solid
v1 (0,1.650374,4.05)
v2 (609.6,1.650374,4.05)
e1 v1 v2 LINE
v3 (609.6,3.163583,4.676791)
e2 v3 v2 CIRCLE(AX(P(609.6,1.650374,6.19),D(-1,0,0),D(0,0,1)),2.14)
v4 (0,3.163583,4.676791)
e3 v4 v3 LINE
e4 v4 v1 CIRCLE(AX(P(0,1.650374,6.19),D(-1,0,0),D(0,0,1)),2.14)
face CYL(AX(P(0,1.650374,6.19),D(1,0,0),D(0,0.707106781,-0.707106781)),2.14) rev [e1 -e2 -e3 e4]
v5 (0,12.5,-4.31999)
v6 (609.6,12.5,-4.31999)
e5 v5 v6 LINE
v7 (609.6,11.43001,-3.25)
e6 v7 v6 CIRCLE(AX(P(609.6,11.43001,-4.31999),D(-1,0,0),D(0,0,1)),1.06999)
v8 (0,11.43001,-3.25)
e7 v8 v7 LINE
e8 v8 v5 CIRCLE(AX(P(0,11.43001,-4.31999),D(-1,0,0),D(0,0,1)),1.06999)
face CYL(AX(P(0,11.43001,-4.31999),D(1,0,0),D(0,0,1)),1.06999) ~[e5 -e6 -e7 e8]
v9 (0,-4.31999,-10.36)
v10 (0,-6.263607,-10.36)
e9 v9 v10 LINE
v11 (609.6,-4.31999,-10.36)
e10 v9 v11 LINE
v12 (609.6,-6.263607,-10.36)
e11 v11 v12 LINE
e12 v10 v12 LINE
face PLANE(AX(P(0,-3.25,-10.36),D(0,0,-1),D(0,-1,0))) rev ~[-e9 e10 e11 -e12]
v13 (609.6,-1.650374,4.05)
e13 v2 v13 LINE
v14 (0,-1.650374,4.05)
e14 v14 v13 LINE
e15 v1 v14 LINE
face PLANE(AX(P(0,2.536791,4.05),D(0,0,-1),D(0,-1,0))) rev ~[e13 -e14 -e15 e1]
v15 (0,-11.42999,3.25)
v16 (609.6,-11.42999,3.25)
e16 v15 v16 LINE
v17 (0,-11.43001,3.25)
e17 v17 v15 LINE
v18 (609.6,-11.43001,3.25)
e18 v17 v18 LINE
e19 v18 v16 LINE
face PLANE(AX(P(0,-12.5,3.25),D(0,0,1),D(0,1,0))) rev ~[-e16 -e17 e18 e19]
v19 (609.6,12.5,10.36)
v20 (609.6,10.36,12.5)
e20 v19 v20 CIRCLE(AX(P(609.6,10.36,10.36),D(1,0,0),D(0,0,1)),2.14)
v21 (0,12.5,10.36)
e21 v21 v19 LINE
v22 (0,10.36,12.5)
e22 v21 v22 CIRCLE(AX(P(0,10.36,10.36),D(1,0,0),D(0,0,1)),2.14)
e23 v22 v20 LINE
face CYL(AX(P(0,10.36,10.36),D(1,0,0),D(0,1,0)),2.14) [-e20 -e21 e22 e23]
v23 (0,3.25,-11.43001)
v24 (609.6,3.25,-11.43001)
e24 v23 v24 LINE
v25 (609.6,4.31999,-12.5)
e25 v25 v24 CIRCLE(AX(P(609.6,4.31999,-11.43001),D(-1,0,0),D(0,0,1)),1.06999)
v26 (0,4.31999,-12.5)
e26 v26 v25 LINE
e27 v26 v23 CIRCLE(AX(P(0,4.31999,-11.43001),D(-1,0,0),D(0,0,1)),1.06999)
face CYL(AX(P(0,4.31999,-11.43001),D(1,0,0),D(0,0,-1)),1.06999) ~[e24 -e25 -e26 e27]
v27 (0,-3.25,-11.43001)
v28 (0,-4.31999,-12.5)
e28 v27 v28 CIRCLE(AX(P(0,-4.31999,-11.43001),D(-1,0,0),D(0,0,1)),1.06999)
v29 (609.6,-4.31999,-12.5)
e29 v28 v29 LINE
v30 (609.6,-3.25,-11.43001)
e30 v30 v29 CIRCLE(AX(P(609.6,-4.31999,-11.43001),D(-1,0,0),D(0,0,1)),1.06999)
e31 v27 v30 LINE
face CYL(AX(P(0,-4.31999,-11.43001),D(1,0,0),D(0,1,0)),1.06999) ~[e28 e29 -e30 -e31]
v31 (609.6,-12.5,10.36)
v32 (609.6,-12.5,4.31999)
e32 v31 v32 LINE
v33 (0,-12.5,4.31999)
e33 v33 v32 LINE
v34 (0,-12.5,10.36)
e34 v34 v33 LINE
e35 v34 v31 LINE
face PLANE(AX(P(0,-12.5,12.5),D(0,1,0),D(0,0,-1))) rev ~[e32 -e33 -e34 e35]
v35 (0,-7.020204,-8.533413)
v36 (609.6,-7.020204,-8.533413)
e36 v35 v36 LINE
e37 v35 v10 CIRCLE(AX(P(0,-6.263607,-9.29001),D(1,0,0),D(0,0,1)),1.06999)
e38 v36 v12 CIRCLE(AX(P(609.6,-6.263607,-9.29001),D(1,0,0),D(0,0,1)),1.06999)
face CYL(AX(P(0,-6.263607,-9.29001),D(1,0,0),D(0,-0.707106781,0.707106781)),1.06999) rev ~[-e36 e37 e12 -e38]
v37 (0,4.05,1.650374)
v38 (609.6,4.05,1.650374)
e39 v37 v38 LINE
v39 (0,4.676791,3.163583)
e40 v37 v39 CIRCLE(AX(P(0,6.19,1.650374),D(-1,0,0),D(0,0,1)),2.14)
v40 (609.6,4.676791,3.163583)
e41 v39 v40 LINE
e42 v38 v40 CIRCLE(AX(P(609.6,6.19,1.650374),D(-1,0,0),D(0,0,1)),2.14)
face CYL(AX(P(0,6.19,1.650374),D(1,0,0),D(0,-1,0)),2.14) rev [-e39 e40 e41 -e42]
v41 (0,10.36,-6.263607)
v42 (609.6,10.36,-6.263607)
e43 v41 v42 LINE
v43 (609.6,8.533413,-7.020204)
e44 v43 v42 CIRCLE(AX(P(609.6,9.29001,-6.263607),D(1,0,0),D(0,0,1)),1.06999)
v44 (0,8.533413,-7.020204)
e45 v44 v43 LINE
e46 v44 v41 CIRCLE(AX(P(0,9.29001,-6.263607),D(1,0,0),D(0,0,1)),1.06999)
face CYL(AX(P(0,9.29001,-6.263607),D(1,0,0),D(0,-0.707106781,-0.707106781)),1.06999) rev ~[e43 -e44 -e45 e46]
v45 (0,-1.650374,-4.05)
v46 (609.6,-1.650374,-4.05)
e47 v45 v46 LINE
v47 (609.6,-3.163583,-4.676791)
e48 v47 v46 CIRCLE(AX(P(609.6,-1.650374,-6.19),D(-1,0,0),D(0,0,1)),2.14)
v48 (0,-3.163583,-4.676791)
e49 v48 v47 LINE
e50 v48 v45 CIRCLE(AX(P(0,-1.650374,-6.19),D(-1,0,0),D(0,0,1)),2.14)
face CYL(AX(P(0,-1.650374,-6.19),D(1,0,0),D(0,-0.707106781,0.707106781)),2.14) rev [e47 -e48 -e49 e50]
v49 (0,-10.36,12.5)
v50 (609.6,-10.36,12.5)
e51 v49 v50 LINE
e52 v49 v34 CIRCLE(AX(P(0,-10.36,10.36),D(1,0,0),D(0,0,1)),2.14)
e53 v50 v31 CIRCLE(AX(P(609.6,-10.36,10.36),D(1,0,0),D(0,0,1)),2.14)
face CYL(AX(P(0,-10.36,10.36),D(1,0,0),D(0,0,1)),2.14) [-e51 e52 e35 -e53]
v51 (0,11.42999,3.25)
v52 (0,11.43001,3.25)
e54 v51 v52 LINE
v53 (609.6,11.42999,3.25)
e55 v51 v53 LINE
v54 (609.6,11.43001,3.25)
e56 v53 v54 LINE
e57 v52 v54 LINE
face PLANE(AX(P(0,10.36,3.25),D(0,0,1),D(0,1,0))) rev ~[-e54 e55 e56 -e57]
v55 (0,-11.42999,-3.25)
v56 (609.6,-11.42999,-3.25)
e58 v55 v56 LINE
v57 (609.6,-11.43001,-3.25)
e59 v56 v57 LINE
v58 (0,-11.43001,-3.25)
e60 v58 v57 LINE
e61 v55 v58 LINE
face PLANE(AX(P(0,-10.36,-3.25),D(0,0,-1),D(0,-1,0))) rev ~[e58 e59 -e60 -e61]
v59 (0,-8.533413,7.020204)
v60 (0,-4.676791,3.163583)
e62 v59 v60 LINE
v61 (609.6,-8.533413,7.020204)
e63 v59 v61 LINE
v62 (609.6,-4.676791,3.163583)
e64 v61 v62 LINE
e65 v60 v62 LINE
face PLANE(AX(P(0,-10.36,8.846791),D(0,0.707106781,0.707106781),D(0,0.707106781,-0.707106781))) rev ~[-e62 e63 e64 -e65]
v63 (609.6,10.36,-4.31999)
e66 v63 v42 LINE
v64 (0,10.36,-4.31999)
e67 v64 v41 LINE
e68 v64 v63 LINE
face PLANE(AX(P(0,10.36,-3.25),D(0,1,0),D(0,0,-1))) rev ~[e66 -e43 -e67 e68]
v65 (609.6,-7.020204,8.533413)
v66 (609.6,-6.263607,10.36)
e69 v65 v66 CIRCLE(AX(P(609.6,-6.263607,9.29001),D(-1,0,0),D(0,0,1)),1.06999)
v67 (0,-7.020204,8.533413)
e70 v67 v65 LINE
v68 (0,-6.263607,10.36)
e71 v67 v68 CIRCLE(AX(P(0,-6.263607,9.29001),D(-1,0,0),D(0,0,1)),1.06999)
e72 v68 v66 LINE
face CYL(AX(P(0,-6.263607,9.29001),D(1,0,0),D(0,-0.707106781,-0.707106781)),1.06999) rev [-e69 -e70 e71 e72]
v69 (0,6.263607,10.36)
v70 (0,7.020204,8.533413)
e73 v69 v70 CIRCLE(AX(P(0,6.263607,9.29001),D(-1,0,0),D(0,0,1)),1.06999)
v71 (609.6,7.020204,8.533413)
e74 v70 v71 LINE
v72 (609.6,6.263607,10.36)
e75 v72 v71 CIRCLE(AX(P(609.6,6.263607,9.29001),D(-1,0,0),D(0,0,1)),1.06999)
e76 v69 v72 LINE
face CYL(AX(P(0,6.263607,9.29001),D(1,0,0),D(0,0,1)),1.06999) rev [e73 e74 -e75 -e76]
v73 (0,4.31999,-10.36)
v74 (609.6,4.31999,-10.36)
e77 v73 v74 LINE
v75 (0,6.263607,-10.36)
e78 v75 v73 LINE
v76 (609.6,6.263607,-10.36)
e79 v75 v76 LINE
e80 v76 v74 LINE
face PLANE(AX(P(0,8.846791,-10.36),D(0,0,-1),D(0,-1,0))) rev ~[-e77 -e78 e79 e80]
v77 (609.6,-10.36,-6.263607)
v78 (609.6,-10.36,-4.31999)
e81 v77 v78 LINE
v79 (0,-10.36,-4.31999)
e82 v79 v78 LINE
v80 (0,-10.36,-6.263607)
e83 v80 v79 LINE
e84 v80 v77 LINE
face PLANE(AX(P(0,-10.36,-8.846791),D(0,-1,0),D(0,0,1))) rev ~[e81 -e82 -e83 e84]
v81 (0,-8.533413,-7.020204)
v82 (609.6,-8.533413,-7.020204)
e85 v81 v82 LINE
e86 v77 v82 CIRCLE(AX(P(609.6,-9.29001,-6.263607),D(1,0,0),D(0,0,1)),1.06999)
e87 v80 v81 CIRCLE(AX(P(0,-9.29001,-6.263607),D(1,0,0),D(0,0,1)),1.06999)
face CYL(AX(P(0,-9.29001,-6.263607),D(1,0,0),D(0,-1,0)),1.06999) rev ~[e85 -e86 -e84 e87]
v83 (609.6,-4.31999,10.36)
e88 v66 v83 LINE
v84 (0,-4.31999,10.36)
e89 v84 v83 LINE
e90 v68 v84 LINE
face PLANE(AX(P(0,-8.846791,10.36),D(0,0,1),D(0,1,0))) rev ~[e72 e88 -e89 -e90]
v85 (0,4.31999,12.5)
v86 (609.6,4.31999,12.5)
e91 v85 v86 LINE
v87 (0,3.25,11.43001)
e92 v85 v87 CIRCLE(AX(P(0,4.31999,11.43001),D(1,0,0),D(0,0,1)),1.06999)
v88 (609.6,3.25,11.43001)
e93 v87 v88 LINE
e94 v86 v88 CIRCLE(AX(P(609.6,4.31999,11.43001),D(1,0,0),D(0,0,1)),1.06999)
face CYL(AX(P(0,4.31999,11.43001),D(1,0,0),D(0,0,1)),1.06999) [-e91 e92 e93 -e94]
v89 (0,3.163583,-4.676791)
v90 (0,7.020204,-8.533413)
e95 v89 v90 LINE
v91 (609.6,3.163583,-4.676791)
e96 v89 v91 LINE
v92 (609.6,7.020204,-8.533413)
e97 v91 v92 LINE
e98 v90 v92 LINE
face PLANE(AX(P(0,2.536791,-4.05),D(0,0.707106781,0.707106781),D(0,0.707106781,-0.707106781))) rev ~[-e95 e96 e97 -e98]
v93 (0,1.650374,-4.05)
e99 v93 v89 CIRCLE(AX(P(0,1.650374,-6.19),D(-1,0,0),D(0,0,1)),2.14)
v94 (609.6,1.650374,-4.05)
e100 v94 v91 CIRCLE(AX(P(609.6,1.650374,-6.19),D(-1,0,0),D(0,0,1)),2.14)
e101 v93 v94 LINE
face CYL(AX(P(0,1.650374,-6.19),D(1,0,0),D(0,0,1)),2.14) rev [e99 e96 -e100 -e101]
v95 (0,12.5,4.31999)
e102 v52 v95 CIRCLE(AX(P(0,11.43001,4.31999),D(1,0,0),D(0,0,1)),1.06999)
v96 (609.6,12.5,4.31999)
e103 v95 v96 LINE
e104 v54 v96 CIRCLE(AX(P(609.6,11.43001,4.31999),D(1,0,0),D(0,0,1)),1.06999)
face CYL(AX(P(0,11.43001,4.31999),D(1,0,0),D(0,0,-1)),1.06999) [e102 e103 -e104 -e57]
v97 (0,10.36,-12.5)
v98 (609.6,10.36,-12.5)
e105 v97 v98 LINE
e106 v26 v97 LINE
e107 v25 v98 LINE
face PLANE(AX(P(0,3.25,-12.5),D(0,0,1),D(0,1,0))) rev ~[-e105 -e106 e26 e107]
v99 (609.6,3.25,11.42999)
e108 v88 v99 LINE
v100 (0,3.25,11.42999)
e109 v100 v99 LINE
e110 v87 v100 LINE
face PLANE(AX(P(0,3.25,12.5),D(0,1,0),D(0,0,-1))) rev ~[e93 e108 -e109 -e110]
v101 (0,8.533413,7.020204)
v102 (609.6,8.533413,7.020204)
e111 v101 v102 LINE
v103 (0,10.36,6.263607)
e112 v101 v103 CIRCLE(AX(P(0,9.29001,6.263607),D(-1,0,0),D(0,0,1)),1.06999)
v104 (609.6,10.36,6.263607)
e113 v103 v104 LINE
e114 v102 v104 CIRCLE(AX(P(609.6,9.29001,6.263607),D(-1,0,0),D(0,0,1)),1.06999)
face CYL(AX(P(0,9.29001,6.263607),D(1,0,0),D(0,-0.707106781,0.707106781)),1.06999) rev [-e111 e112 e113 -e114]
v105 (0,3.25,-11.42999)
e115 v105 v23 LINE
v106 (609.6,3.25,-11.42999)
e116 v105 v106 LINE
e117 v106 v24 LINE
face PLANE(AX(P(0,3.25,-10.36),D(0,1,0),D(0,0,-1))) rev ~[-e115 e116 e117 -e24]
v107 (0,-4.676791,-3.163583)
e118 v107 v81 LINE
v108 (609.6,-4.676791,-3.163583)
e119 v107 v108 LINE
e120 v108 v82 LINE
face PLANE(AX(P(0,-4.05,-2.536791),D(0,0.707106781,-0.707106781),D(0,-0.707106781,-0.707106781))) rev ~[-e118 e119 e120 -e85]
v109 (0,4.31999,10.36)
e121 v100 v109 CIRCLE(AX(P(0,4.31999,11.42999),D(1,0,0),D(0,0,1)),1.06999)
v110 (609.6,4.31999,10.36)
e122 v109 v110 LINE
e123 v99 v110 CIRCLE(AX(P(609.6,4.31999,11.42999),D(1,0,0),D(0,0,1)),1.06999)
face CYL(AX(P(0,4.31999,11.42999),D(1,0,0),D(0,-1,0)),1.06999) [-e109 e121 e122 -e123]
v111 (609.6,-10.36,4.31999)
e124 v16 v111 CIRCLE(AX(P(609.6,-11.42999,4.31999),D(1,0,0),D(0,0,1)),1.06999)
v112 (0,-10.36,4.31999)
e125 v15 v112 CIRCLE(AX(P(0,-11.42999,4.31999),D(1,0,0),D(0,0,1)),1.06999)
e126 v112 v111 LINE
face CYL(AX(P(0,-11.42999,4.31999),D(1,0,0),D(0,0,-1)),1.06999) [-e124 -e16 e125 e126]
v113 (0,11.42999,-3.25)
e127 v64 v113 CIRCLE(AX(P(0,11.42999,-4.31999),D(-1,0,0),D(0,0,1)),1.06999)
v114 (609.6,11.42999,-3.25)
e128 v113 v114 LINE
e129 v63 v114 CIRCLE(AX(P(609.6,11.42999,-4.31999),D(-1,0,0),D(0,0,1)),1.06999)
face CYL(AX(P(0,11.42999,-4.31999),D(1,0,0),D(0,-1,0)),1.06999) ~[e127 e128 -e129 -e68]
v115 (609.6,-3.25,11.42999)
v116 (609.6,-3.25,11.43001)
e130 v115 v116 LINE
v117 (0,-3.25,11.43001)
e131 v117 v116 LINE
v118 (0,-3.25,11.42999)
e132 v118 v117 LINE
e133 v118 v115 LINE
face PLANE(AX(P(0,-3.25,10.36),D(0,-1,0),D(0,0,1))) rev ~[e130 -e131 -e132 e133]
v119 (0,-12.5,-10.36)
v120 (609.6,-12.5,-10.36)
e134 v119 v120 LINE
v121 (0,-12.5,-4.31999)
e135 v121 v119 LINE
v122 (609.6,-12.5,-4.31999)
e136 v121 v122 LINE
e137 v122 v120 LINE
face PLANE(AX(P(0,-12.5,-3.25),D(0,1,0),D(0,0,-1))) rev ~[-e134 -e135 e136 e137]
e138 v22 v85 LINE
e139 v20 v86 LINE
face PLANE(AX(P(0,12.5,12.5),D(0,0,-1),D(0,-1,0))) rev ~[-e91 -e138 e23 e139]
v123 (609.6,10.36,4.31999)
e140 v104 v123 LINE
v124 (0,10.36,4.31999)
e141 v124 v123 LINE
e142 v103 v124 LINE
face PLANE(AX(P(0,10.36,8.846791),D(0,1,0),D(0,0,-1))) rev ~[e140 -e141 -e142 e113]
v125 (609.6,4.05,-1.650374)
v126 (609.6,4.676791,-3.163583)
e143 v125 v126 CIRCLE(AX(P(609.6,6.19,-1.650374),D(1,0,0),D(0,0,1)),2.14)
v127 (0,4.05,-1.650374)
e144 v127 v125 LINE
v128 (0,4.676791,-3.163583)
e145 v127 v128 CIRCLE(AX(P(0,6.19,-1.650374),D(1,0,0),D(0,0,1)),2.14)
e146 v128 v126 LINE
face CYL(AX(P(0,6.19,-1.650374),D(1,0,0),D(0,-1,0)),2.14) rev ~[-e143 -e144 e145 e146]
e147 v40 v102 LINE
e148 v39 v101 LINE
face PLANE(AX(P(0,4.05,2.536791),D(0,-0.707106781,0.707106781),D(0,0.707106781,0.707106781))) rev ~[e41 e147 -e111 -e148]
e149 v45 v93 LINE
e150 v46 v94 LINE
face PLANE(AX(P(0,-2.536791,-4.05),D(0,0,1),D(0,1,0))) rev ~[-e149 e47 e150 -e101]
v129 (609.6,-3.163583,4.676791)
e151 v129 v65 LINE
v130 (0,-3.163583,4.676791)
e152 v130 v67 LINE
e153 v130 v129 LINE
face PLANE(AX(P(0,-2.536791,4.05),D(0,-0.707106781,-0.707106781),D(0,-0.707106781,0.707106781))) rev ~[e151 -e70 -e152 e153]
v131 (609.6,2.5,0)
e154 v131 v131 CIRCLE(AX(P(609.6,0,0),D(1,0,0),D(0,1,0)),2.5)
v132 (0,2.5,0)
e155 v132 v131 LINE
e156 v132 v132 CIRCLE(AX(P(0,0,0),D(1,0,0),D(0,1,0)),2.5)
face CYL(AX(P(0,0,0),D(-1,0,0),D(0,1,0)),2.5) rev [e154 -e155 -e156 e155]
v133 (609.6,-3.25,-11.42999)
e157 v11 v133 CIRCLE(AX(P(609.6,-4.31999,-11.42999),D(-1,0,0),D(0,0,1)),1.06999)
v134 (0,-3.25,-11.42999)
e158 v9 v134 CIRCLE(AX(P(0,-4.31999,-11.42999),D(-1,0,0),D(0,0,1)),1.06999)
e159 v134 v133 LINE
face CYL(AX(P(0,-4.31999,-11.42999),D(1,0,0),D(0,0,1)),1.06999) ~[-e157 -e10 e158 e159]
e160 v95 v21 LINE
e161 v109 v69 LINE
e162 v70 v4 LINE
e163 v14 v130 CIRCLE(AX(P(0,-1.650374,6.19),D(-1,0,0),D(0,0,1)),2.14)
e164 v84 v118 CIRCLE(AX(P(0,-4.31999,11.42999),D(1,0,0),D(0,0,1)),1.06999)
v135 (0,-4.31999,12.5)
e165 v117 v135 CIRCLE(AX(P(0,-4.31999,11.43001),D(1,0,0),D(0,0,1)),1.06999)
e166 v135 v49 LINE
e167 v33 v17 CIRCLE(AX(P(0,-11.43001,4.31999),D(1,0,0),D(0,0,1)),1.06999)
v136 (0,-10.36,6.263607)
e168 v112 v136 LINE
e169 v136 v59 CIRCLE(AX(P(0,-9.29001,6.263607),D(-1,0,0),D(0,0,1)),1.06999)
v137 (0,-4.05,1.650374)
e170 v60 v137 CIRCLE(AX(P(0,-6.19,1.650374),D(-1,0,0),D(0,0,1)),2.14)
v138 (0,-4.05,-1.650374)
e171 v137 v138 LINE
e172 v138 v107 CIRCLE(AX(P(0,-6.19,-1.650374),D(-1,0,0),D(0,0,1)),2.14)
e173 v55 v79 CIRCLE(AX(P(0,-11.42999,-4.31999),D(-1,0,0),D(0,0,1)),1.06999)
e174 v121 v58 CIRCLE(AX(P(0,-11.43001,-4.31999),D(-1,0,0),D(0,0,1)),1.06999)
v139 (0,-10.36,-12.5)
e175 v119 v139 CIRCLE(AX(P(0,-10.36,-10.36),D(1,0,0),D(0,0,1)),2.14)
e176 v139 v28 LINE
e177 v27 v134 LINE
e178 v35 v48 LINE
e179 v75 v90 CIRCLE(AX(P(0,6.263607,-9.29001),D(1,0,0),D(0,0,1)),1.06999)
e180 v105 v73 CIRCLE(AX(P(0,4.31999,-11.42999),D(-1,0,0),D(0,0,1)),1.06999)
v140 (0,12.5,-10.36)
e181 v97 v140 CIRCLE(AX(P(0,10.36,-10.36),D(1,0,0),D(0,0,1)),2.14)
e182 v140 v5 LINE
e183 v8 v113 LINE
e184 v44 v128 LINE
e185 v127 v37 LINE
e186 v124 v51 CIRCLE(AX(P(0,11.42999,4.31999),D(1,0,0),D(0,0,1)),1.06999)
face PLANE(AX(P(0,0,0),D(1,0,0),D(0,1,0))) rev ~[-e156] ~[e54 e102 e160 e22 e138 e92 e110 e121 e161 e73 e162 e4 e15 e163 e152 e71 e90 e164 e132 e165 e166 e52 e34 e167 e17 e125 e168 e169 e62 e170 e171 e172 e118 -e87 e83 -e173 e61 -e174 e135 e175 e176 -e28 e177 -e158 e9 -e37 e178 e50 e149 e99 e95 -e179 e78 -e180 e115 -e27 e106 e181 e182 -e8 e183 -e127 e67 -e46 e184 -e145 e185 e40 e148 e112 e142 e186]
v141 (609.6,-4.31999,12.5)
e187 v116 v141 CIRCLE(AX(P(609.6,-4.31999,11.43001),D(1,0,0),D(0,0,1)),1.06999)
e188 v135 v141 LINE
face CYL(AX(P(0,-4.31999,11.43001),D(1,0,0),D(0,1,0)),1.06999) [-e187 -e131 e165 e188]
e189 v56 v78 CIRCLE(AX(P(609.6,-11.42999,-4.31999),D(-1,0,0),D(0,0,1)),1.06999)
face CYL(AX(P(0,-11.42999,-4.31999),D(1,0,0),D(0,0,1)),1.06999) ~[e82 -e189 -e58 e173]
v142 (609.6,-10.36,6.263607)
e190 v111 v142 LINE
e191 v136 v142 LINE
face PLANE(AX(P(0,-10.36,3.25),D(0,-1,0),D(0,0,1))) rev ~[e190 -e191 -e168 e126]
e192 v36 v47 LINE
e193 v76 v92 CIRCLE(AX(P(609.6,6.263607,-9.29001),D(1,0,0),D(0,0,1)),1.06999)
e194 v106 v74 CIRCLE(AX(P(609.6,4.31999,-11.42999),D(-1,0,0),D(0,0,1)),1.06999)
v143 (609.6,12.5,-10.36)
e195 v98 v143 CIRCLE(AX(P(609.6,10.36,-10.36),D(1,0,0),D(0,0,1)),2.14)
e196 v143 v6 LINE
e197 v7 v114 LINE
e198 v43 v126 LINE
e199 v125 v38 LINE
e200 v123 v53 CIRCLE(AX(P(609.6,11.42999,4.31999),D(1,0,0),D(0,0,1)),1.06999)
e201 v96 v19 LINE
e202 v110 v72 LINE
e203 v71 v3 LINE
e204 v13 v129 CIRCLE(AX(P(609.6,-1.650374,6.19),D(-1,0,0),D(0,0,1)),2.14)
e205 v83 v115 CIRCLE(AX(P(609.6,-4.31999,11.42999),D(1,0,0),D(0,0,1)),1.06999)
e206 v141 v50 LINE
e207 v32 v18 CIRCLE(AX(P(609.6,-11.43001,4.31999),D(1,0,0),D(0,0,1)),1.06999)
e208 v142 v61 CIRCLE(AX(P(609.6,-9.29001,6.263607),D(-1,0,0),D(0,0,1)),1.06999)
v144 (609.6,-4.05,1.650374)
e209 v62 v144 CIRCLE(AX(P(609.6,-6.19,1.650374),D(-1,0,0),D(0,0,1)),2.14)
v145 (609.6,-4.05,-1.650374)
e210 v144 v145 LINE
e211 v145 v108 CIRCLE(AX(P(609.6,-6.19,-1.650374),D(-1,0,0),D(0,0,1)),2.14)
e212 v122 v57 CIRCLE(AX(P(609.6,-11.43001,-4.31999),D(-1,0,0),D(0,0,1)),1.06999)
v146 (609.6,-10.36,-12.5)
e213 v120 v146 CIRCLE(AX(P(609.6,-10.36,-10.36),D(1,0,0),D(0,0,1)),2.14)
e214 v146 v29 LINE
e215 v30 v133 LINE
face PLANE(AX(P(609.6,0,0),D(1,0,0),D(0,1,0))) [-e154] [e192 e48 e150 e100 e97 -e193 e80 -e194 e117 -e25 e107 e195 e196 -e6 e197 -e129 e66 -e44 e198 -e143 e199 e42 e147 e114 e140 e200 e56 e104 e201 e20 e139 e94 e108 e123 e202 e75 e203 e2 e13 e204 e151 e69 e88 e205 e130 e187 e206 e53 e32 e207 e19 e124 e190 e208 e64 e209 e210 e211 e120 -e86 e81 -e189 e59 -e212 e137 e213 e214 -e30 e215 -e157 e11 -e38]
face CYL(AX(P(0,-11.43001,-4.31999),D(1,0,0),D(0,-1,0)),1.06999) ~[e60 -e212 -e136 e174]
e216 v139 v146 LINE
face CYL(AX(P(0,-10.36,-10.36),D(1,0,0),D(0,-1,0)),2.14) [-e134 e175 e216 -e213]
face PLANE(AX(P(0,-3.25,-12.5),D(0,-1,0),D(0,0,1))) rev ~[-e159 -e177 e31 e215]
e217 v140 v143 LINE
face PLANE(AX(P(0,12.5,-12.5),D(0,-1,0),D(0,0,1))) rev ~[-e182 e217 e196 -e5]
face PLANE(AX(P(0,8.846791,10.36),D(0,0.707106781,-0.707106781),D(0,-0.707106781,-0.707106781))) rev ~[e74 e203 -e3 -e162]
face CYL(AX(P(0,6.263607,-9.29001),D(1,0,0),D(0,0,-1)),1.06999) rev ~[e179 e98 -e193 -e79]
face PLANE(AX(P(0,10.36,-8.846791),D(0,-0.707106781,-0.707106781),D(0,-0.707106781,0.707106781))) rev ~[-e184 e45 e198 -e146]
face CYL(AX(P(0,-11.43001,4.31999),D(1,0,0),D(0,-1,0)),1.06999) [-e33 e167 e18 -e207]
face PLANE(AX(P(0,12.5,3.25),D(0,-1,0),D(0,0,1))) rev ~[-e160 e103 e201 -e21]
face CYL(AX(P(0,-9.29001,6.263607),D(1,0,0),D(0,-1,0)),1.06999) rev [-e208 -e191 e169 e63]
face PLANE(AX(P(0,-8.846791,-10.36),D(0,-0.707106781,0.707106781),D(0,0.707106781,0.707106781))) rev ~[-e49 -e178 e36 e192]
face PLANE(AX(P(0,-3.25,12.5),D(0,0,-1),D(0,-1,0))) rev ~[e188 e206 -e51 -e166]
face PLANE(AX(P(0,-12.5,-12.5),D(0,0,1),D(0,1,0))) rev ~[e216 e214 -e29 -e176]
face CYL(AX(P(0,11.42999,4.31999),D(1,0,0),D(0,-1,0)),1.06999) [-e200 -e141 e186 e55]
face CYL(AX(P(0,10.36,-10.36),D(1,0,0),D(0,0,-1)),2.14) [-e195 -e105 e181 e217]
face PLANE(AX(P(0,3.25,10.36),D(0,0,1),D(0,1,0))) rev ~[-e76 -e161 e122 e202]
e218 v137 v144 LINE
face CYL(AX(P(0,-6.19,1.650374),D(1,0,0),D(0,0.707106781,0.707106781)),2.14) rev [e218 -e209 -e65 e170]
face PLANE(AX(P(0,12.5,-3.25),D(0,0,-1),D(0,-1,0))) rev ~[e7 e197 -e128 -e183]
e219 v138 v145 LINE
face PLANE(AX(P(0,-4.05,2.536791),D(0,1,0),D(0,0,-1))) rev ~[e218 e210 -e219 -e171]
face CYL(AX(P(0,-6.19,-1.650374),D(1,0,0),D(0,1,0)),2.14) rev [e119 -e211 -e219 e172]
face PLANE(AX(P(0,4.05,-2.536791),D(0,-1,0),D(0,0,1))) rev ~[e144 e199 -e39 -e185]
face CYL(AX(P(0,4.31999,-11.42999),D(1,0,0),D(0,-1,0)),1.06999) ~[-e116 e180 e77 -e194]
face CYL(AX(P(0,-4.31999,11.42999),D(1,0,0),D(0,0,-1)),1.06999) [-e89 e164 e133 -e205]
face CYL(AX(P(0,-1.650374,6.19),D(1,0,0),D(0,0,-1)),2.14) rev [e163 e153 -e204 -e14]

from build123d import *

# Parameters (mm, degrees)
F0_R     = 2.5
F2_DEPTH = 609.6
F3_R     = 2.14
F4_R     = 1.06999


# Not quite as in the source:
# - a fillet or chamfer is up to 0.001 mm smaller than in the source, because OpenCascade refuses the exact size


with BuildPart() as f2:
    # F0 (on Right) → F2 (new body)
    with BuildSketch(Plane.YZ):
        Polygon((2.5367914883, -4.05), (4.05, -4.05), (4.05, -2.5367914883), (4.05, 2.5367914883), (4.05, 4.05), (2.5367914883, 4.05), (-2.5367914883, 4.05), (-4.05, 4.05), (-4.05, 2.5367914883), (-4.05, -2.5367914883), (-4.05, -4.05), (-2.5367914883, -4.05), align=None)
        Circle(F0_R, mode=Mode.SUBTRACT)
        Polygon((-10.36, 8.8467914883), (-4.05, 2.5367914883), (-4.05, 4.05), (-2.5367914883, 4.05), (-8.8467914883, 10.36), (-3.25, 10.36), (-3.25, 12.5), (-12.5, 12.5), (-12.5, 3.25), (-10.36, 3.25), align=None)
        Polygon((4.05, 4.05), (4.05, 2.5367914883), (10.36, 8.8467914883), (10.36, 3.25), (12.5, 3.25), (12.5, 12.5), (3.25, 12.5), (3.25, 10.36), (8.8467914883, 10.36), (2.5367914883, 4.05), align=None)
        Polygon((-8.8467914883, -10.36), (-2.5367914883, -4.05), (-4.05, -4.05), (-4.05, -2.5367914883), (-10.36, -8.8467914883), (-10.36, -3.25), (-12.5, -3.25), (-12.5, -12.5), (-3.25, -12.5), (-3.25, -10.36), align=None)
        Polygon((4.05, -2.5367914883), (4.05, -4.05), (2.5367914883, -4.05), (8.8467914883, -10.36), (3.25, -10.36), (3.25, -12.5), (12.5, -12.5), (12.5, -3.25), (10.36, -3.25), (10.36, -8.8467914883), align=None)
    extrude(amount=F2_DEPTH)

    # F3
    f3_edges = [f2.edges().sort_by_distance(p)[0] for p in [
        (304.8, -12.5, 12.5),
        (304.8, 12.5, 12.5),
        (304.8, 12.5, -12.5),
        (304.8, -12.5, -12.5),
        (304.8, -4.05, 2.536791),
        (304.8, -4.05, -2.536791),
        (304.8, -2.536791, 4.05),
        (304.8, 2.536791, 4.05),
        (304.8, 4.05, 2.536791),
        (304.8, 4.05, -2.536791),
        (304.8, -2.536791, -4.05),
        (304.8, 2.536791, -4.05),
    ]]
    fillet(f3_edges, radius=F3_R)

    # F4 (radius 1.07 in the source; OpenCascade refuses exactly that, so slightly less here)
    f4_edges = [f2.edges().sort_by_distance(p)[0] for p in [
        (304.8, -12.5, 3.25),
        (304.8, -10.36, 3.25),
        (304.8, -3.25, 12.5),
        (304.8, -3.25, 10.36),
        (304.8, 3.25, 12.5),
        (304.8, 3.25, 10.36),
        (304.8, 10.36, 3.25),
        (304.8, 12.5, 3.25),
        (304.8, 10.36, -3.25),
        (304.8, 12.5, -3.25),
        (304.8, 3.25, -10.36),
        (304.8, 3.25, -12.5),
        (304.8, -3.25, -10.36),
        (304.8, -3.25, -12.5),
        (304.8, -10.36, 8.846791),
        (304.8, -8.846791, 10.36),
        (304.8, 8.846791, 10.36),
        (304.8, 10.36, 8.846791),
        (304.8, 8.846791, -10.36),
        (304.8, 10.36, -8.846791),
        (304.8, -8.846791, -10.36),
        (304.8, -10.36, -8.846791),
        (304.8, -10.36, -3.25),
        (304.8, -12.5, -3.25),
    ]]
    fillet(f4_edges, radius=F4_R)


solid = f2.part
